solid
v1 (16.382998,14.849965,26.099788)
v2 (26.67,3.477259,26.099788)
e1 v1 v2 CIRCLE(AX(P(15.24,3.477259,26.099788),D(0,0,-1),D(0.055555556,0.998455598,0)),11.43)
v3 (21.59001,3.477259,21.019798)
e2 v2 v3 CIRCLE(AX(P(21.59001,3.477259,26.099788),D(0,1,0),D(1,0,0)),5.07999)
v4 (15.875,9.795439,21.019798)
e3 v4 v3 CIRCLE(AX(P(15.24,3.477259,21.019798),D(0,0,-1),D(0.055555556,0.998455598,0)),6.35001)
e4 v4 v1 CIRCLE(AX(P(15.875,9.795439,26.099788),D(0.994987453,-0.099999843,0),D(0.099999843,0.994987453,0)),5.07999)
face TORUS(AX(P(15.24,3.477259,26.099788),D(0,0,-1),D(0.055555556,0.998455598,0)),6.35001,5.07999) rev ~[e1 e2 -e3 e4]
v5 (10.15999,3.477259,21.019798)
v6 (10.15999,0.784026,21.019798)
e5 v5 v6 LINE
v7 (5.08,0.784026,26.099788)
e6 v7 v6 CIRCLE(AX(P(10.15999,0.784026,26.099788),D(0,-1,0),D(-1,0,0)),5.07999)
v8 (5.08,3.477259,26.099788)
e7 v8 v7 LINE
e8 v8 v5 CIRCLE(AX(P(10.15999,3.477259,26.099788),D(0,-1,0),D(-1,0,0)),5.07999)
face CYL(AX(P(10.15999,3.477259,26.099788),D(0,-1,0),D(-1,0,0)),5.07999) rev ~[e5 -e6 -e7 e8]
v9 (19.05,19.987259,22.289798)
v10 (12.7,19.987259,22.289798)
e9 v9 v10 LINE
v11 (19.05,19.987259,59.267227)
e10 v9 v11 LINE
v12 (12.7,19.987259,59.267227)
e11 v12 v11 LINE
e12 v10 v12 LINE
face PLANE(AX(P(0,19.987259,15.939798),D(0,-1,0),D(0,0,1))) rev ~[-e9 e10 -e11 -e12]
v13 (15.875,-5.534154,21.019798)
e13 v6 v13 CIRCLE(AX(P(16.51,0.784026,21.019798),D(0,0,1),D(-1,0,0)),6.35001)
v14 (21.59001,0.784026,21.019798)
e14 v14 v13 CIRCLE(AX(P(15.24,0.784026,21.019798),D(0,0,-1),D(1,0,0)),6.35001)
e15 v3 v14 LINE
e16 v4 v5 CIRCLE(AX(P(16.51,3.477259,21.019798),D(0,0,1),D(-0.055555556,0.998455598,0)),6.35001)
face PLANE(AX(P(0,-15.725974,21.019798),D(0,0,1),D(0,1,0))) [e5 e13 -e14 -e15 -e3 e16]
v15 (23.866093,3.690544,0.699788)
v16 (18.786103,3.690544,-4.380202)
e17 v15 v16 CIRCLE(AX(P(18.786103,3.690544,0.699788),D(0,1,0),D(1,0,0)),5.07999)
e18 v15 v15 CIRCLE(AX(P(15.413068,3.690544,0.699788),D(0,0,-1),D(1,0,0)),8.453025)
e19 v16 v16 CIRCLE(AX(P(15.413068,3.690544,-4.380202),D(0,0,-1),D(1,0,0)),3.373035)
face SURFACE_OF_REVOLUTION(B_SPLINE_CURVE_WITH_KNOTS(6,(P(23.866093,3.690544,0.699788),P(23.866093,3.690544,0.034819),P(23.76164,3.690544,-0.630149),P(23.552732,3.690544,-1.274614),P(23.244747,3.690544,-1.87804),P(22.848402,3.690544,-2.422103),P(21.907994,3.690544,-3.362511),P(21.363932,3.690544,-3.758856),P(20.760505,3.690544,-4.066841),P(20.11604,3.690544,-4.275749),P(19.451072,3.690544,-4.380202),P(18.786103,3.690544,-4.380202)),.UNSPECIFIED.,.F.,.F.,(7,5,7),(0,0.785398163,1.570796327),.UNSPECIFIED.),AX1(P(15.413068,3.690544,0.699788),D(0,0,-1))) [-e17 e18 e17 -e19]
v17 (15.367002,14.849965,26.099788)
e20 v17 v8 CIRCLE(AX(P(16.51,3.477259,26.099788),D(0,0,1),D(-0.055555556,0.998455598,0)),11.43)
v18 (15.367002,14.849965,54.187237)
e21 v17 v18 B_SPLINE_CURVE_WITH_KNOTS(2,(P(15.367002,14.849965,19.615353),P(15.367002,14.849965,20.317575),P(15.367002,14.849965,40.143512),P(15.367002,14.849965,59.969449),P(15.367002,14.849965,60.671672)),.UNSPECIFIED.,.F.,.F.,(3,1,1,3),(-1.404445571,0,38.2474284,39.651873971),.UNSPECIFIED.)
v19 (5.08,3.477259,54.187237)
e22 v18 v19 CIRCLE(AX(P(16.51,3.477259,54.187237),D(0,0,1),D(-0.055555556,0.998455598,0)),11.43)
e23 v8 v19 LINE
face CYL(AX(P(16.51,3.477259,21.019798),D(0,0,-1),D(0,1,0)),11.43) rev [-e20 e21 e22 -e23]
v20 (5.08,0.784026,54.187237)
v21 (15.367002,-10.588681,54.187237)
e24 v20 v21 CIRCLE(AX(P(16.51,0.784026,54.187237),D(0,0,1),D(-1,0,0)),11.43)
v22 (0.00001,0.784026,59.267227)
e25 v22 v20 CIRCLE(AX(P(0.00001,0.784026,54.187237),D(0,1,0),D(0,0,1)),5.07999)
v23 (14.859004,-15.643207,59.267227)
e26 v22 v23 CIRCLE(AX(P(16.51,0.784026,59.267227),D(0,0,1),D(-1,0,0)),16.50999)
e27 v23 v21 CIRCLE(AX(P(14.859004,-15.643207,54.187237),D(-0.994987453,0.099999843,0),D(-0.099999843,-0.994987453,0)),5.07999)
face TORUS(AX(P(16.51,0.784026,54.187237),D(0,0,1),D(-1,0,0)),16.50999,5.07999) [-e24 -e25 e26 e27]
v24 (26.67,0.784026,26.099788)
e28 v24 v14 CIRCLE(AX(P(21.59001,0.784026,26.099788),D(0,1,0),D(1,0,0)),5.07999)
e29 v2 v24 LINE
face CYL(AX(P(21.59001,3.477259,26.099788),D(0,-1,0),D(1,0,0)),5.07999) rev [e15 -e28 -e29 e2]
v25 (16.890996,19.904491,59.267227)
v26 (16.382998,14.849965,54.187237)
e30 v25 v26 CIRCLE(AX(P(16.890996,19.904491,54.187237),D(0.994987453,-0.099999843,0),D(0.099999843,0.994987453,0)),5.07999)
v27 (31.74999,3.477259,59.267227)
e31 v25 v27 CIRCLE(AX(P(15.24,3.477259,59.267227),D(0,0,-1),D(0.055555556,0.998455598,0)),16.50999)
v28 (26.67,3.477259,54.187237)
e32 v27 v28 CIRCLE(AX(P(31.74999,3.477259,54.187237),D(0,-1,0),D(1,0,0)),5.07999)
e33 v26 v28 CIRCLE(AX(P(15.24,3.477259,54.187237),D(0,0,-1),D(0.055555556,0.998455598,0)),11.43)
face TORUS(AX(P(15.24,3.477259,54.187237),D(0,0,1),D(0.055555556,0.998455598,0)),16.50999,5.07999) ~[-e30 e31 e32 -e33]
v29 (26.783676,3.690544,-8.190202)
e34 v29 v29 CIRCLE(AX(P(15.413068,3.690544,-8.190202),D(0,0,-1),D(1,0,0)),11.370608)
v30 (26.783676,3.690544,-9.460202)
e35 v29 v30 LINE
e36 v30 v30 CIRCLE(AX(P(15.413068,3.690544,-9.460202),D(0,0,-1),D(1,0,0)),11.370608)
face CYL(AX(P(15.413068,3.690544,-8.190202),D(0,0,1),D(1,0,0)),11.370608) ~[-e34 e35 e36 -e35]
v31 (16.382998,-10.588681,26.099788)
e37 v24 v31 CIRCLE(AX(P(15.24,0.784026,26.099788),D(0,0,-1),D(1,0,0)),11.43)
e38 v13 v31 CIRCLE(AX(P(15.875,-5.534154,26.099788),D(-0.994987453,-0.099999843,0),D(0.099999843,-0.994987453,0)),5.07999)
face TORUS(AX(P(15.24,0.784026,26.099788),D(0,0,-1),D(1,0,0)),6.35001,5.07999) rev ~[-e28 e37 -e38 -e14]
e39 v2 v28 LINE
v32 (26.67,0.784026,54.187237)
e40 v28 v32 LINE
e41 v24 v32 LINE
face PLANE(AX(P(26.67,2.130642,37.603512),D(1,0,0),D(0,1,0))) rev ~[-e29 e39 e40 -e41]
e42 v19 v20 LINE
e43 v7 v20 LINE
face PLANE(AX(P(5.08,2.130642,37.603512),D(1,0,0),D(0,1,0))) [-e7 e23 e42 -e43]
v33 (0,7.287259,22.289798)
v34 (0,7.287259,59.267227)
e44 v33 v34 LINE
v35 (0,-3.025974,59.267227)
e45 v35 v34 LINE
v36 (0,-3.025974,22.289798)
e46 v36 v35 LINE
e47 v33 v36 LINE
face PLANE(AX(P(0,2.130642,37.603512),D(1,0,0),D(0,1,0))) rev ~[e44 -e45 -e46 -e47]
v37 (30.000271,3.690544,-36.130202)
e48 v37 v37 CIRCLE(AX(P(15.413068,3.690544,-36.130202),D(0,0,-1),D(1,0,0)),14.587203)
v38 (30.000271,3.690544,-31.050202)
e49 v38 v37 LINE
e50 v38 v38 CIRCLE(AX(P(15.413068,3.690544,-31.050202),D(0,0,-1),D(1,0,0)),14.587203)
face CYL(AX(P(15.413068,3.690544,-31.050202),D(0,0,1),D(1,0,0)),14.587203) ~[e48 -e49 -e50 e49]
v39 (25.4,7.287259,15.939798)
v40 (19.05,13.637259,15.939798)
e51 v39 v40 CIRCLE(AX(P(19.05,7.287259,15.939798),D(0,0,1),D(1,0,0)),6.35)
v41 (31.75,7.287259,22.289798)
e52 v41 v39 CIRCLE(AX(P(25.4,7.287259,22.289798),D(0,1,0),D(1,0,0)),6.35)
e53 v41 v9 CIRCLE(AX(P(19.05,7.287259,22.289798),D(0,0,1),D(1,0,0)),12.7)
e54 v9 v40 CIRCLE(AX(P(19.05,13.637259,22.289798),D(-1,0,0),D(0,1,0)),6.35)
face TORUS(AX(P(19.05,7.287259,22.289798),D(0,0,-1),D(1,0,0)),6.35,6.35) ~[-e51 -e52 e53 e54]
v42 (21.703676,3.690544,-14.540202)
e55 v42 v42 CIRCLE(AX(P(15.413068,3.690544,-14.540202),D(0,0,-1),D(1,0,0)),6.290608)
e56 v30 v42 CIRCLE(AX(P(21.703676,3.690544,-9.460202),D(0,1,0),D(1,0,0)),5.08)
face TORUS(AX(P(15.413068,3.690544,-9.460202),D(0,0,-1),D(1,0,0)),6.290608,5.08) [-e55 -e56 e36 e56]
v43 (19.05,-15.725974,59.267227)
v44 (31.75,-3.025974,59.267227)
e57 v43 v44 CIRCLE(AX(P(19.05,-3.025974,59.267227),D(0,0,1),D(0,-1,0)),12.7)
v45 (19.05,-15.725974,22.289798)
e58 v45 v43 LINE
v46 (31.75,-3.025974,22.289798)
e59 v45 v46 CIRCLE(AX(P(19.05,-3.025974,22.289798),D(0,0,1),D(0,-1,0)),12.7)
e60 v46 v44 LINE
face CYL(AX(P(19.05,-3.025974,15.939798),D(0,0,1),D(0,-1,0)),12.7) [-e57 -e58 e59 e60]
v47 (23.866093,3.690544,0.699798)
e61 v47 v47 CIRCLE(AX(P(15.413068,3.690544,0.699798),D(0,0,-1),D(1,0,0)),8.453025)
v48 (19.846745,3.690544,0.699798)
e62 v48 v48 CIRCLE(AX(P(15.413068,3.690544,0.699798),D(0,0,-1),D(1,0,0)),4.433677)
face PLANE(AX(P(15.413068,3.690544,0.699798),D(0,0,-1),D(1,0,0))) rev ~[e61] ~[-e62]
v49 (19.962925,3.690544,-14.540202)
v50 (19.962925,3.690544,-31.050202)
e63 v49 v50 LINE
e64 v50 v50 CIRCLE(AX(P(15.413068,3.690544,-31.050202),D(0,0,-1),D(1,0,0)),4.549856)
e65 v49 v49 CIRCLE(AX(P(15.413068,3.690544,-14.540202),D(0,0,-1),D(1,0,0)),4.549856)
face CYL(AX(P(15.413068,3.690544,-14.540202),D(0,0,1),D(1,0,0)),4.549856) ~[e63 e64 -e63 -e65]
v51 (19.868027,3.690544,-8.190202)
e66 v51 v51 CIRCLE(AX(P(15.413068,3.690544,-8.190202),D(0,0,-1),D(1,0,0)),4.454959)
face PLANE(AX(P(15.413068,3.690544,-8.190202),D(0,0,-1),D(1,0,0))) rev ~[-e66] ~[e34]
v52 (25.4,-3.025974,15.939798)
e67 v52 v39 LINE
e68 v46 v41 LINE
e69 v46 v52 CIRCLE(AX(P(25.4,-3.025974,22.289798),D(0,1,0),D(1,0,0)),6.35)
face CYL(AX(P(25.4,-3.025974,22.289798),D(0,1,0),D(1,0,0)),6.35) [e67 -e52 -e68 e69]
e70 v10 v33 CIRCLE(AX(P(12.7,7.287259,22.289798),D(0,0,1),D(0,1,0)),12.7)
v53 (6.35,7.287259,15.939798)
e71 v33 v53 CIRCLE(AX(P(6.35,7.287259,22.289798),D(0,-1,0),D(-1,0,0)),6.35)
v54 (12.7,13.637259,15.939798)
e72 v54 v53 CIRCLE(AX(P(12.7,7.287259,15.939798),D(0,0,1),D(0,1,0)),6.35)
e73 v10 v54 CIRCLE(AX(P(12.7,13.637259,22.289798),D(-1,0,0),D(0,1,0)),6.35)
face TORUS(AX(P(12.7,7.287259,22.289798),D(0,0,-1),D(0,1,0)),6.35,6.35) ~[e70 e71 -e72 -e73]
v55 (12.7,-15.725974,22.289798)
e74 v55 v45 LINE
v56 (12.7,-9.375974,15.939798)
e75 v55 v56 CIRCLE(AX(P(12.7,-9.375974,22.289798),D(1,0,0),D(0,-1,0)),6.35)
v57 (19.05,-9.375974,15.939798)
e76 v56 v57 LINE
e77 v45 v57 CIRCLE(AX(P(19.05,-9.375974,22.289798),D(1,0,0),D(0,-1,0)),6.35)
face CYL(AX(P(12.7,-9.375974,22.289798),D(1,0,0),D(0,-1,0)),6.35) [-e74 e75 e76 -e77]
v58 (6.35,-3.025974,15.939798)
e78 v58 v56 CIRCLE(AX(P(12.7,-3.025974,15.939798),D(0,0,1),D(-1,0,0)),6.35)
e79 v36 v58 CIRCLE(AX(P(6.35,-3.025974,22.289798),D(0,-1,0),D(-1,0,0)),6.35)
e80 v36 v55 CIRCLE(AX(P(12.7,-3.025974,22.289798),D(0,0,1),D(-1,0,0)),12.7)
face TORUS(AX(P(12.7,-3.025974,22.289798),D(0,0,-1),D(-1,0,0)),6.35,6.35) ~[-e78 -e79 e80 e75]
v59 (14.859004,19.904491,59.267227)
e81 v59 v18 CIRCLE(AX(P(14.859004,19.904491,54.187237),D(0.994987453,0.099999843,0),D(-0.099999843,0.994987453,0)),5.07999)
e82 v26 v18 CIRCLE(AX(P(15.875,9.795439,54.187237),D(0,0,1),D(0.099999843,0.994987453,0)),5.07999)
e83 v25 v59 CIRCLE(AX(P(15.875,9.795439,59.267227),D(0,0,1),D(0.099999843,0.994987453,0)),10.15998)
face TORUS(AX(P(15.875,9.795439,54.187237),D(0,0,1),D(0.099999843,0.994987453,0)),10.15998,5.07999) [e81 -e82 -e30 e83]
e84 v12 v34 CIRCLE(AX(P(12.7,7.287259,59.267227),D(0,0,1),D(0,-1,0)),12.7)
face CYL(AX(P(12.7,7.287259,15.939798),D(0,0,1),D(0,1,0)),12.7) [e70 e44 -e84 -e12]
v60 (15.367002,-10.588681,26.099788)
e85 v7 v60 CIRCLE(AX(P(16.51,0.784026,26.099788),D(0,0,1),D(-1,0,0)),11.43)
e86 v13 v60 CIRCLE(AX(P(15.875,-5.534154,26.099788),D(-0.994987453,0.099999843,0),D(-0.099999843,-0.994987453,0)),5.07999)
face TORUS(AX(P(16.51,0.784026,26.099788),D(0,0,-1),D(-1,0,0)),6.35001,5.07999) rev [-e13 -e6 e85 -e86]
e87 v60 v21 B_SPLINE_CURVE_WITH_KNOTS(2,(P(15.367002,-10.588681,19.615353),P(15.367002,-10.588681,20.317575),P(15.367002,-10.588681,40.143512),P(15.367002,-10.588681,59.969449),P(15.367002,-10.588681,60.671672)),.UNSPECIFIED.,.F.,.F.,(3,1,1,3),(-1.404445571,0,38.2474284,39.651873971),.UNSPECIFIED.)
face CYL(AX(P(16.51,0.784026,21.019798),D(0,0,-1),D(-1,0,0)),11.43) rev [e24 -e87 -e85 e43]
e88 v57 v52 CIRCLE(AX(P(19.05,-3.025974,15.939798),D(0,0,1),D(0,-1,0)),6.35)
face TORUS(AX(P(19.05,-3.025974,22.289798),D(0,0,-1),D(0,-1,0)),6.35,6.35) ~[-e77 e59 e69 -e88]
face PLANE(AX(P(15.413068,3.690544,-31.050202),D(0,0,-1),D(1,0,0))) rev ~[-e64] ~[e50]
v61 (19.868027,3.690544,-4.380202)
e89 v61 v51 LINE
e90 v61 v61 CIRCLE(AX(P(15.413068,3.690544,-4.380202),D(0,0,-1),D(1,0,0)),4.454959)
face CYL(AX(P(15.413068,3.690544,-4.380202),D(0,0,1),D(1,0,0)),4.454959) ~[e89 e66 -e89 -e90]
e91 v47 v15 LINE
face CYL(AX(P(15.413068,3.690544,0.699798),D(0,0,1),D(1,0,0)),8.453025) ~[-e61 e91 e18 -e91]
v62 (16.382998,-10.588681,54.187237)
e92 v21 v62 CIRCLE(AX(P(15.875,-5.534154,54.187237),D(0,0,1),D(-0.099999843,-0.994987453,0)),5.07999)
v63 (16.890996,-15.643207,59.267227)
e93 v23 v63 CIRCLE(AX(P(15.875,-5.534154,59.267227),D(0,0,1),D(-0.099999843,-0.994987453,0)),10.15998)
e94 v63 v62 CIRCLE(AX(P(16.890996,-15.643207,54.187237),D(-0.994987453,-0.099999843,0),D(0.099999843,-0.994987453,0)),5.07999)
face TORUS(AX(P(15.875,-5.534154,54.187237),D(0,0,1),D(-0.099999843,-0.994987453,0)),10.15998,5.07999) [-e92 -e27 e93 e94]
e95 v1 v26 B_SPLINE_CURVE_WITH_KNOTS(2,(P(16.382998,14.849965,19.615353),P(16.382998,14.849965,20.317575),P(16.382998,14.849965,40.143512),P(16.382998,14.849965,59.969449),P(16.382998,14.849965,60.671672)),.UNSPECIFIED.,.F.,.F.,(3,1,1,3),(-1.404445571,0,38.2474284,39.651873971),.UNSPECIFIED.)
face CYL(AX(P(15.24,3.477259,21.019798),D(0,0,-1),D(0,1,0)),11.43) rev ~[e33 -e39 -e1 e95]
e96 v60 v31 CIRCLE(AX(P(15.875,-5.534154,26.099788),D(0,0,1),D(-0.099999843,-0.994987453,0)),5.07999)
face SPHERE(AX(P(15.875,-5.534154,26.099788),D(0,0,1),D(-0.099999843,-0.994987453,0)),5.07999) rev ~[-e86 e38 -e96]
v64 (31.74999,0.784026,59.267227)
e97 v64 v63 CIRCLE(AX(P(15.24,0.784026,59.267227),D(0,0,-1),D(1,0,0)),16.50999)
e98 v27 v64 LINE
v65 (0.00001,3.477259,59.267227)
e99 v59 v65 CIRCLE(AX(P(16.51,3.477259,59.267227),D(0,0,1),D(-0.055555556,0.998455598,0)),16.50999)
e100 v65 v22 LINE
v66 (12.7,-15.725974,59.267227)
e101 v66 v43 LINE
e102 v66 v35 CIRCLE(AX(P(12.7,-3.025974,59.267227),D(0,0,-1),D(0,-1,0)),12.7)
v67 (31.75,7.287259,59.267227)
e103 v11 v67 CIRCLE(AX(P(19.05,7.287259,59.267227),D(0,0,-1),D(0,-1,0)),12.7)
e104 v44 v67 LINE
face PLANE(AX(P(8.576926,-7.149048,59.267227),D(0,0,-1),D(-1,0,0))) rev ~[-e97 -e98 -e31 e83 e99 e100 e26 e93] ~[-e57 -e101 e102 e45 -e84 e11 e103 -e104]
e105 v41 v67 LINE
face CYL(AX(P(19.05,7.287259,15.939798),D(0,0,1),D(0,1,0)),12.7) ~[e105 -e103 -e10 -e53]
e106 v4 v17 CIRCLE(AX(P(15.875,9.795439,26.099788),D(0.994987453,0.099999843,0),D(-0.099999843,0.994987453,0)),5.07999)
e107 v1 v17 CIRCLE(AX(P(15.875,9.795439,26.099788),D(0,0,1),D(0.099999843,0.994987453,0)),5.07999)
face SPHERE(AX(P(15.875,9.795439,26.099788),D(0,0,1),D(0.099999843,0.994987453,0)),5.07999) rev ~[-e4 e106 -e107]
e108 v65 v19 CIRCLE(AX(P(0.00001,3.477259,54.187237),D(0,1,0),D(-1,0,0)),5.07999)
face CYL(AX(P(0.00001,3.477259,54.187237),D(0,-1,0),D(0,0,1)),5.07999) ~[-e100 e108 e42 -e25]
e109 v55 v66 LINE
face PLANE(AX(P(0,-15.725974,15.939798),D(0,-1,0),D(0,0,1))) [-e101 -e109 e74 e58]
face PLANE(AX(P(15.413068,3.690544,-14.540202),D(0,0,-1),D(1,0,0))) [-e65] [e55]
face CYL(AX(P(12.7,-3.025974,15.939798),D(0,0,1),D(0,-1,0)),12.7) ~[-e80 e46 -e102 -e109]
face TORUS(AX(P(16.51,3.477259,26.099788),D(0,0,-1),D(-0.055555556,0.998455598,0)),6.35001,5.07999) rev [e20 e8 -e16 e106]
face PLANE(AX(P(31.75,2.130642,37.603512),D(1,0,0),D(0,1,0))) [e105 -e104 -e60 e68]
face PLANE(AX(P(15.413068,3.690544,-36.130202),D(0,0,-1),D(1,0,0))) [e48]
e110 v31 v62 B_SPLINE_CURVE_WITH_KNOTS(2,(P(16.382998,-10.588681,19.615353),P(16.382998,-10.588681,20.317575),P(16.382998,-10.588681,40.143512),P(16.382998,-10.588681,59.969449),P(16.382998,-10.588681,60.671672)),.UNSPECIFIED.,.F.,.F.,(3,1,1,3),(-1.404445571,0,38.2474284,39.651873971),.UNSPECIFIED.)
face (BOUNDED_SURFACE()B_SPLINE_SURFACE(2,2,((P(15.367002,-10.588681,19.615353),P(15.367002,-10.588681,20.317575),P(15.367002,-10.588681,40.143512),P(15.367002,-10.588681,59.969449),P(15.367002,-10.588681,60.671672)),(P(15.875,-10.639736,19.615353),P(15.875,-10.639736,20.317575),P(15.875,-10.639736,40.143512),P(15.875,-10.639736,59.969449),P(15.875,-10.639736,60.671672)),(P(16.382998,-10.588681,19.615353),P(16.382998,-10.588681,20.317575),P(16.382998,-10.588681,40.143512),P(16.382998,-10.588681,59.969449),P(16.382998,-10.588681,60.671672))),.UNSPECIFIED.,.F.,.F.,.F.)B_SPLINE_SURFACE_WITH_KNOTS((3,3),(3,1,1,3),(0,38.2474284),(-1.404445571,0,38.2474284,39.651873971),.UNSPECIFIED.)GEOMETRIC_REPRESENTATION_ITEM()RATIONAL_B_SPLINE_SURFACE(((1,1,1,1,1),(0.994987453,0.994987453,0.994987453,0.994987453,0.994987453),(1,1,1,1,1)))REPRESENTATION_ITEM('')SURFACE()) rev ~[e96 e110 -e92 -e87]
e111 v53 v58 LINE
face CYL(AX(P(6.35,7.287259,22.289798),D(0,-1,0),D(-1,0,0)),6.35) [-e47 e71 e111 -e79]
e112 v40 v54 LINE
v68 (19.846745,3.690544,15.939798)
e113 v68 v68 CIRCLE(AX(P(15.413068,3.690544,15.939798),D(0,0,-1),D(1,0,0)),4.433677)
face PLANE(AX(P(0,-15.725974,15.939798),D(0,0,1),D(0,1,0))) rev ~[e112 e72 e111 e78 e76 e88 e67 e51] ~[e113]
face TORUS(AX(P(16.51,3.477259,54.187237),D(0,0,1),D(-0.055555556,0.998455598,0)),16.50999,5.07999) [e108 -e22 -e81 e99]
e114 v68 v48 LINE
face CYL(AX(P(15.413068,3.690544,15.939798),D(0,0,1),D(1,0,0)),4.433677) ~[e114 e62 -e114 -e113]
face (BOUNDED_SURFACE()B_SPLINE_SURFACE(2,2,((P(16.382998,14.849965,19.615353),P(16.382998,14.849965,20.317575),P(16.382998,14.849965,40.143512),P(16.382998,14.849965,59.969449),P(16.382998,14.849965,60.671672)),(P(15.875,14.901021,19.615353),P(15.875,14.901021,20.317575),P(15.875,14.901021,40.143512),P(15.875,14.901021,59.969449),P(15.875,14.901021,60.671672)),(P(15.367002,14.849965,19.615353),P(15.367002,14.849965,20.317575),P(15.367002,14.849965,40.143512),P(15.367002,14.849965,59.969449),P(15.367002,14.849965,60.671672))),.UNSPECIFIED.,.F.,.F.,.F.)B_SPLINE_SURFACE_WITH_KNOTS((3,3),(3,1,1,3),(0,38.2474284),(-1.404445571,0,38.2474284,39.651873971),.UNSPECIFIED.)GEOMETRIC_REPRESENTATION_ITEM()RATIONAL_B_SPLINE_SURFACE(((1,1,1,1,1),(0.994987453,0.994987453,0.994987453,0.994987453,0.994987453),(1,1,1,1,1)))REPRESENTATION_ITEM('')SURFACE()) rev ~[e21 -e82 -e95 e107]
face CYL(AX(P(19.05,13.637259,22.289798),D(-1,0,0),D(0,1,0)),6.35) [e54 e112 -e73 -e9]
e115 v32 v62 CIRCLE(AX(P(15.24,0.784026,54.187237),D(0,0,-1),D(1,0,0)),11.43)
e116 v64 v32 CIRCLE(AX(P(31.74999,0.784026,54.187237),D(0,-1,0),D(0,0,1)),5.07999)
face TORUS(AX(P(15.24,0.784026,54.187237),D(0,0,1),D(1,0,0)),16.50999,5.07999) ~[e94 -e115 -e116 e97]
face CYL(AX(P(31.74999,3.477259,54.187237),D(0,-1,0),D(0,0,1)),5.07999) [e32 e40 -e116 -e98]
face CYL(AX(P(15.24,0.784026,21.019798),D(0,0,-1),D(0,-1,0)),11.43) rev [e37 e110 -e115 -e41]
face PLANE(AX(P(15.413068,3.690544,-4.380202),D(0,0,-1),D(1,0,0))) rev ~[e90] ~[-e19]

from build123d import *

# Parameters (mm, degrees)
F0_W        = 35.713232588
F0_H        = 43.3274284005
F1_DEPTH    = 31.75
F2_T        = -5.08
F3_R        = 12.7
F4_T1_DEPTH = 38.2474284005
F5_R        = 6.35
F6_R        = 5.07999
F7_R        = 4.4336766497
F8_DEPTH    = 15.24
F9_R        = 8.453024689
F10_DEPTH   = 5.08
F11_R       = 5.07999
F12_R       = 4.45495875
F13_DEPTH   = 3.81
F14_R       = 11.3706075555
F15_DEPTH   = 6.35
F16_R       = 5.08
F17_R       = 4.5498563982
F18_DEPTH   = 16.51
F19_R       = 14.5872026809
F20_DEPTH   = 5.08


# Not quite as in the source:
# - a fillet or chamfer that OpenCascade refuses, or shapes differently, is made with other operations: its cross-section is extruded or revolved along the edge and cut away or added
# - a fillet or chamfer is up to 0.001 mm smaller than in the source, because OpenCascade refuses the exact size


with BuildPart() as f1:
    # F0 (on Right) → F1 (new body)
    with BuildSketch(Plane.YZ):
        with Locations((2.1306423005, 37.6035124063)):
            Rectangle(F0_W, F0_H)
    extrude(amount=F1_DEPTH)

    # F2
    f2_openings = [f1.faces().sort_by_distance(p)[0] for p in [
        (15.875, 2.130642, 59.267227),
    ]]
    offset(amount=F2_T, openings=f2_openings)

    # F3
    f3_edges = [f1.edges().sort_by_distance(p)[0] for p in [
        (0, -15.725974, 37.603512),
        (31.75, -15.725974, 37.603512),
        (31.75, 19.987259, 37.603512),
        (0, 19.987259, 37.603512),
    ]]
    fillet(f3_edges, radius=F3_R)

    # F4: fillet of radius 11.43 on 4 edges, made by hand

    # F4_s2 → F4_t1 (join)
    with BuildSketch(Plane.XY.offset(21.0197982061)):
        with BuildLine():
            ThreePointArc((5.08, 0.7840260065), (8.427769491, -7.2982045025), (16.51, -10.6459739935))
            Line((16.51, -10.6459739935), (5.08, -10.6459739935))
            Line((5.08, -10.6459739935), (5.08, 0.7840260065))
        make_face()
        with BuildLine():
            ThreePointArc((16.51, 14.9072585945), (8.427769491, 11.5594891034), (5.08, 3.4772585945))
            Line((5.08, 3.4772585945), (5.08, 14.9072585945))
            Line((5.08, 14.9072585945), (16.51, 14.9072585945))
        make_face()
        with BuildLine():
            ThreePointArc((15.24, 14.9072585945), (23.322230509, 11.5594891034), (26.67, 3.4772585945))
            Line((26.67, 3.4772585945), (26.67, 14.9072585945))
            Line((26.67, 14.9072585945), (15.24, 14.9072585945))
        make_face()
        with BuildLine():
            ThreePointArc((15.24, -10.6459739935), (23.322230509, -7.2982045025), (26.67, 0.7840260065))
            Line((26.67, 0.7840260065), (26.67, -10.6459739935))
            Line((26.67, -10.6459739935), (15.24, -10.6459739935))
        make_face()
    extrude(amount=F4_T1_DEPTH)

    # F5
    f5_edges = [f1.edges().sort_by_distance(p)[0] for p in [
        (15.875, -15.725974, 15.939798),
        (3.719744, -12.00623, 15.939798),
        (0, 2.130642, 15.939798),
        (3.719744, 16.267515, 15.939798),
        (15.875, 19.987259, 15.939798),
        (28.030256, 16.267515, 15.939798),
        (31.75, 2.130642, 15.939798),
        (28.030256, -12.00623, 15.939798),
    ]]
    fillet(f5_edges, radius=F5_R)

    # F6 (radius 5.08 in the source; OpenCascade refuses exactly that, so slightly less here)
    f6_edges = [f1.edges().sort_by_distance(p)[0] for p in [
        (15.875, 14.889606, 40.143512),
        (26.67, 3.477259, 40.143512),
        (23.543702, 11.331775, 21.019798),
        (23.543702, 11.331775, 59.267227),
        (15.875, -10.628321, 40.143512),
        (26.67, 0.784026, 40.143512),
        (23.543702, -7.07049, 21.019798),
        (23.543702, -7.07049, 59.267227),
        (5.08, 3.477259, 40.143512),
        (8.206298, 11.331775, 21.019798),
        (8.206298, 11.331775, 59.267227),
        (5.08, 0.784026, 40.143512),
        (8.206298, -7.07049, 21.019798),
        (8.206298, -7.07049, 59.267227),
    ]]
    fillet(f6_edges, radius=F6_R)

    # F7 (on face) → F8 (join)
    with BuildSketch(Plane(origin=(0, 0, 15.9397982061), x_dir=(1, 0, 0), z_dir=(0, 0, -1))):
        with Locations((15.4130682349, -3.6905435845)):
            Circle(F7_R)
    extrude(amount=F8_DEPTH)

    # F9 (on face) → F10 (join)
    with BuildSketch(Plane(origin=(0, 0, 0.6997982061), x_dir=(1, 0, 0), z_dir=(0, 0, -1))):
        with Locations((15.4130682349, -3.6905435845)):
            Circle(F9_R)
    extrude(amount=F10_DEPTH)

    # F11 (radius 5.08 in the source; OpenCascade refuses exactly that, so slightly less here)
    f11_edges = [f1.edges().sort_by_distance(p)[0] for p in [
        (6.960044, 3.690544, -4.380202),
    ]]
    fillet(f11_edges, radius=F11_R)

    # F12 (on face) → F13 (join)
    with BuildSketch(Plane(origin=(0, 0, -4.3802017939), x_dir=(1, 0, 0), z_dir=(0, 0, -1))):
        with Locations((15.4130682349, -3.6905435845)):
            Circle(F12_R)
    extrude(amount=F13_DEPTH)

    # F14 (on face) → F15 (join)
    with BuildSketch(Plane(origin=(0, 0, -8.1902017939), x_dir=(1, 0, 0), z_dir=(0, 0, -1))):
        with Locations((15.4130682349, -3.6905435845)):
            Circle(F14_R)
    extrude(amount=F15_DEPTH)

    # F16
    f16_edges = [f1.edges().sort_by_distance(p)[0] for p in [
        (4.042461, 3.690544, -14.540202),
    ]]
    fillet(f16_edges, radius=F16_R)

    # F17 (on face) → F18 (join)
    with BuildSketch(Plane(origin=(0, 0, -14.5402017939), x_dir=(1, 0, 0), z_dir=(0, 0, -1))):
        with Locations((15.4130682349, -3.6905435845)):
            Circle(F17_R)
    extrude(amount=F18_DEPTH)

    # F19 (on face) → F20 (join)
    with BuildSketch(Plane(origin=(0, 0, -31.0502017939), x_dir=(1, 0, 0), z_dir=(0, 0, -1))):
        with Locations((15.4130682349, -3.6905435845)):
            Circle(F19_R)
    extrude(amount=F20_DEPTH)


solid = f1.part
